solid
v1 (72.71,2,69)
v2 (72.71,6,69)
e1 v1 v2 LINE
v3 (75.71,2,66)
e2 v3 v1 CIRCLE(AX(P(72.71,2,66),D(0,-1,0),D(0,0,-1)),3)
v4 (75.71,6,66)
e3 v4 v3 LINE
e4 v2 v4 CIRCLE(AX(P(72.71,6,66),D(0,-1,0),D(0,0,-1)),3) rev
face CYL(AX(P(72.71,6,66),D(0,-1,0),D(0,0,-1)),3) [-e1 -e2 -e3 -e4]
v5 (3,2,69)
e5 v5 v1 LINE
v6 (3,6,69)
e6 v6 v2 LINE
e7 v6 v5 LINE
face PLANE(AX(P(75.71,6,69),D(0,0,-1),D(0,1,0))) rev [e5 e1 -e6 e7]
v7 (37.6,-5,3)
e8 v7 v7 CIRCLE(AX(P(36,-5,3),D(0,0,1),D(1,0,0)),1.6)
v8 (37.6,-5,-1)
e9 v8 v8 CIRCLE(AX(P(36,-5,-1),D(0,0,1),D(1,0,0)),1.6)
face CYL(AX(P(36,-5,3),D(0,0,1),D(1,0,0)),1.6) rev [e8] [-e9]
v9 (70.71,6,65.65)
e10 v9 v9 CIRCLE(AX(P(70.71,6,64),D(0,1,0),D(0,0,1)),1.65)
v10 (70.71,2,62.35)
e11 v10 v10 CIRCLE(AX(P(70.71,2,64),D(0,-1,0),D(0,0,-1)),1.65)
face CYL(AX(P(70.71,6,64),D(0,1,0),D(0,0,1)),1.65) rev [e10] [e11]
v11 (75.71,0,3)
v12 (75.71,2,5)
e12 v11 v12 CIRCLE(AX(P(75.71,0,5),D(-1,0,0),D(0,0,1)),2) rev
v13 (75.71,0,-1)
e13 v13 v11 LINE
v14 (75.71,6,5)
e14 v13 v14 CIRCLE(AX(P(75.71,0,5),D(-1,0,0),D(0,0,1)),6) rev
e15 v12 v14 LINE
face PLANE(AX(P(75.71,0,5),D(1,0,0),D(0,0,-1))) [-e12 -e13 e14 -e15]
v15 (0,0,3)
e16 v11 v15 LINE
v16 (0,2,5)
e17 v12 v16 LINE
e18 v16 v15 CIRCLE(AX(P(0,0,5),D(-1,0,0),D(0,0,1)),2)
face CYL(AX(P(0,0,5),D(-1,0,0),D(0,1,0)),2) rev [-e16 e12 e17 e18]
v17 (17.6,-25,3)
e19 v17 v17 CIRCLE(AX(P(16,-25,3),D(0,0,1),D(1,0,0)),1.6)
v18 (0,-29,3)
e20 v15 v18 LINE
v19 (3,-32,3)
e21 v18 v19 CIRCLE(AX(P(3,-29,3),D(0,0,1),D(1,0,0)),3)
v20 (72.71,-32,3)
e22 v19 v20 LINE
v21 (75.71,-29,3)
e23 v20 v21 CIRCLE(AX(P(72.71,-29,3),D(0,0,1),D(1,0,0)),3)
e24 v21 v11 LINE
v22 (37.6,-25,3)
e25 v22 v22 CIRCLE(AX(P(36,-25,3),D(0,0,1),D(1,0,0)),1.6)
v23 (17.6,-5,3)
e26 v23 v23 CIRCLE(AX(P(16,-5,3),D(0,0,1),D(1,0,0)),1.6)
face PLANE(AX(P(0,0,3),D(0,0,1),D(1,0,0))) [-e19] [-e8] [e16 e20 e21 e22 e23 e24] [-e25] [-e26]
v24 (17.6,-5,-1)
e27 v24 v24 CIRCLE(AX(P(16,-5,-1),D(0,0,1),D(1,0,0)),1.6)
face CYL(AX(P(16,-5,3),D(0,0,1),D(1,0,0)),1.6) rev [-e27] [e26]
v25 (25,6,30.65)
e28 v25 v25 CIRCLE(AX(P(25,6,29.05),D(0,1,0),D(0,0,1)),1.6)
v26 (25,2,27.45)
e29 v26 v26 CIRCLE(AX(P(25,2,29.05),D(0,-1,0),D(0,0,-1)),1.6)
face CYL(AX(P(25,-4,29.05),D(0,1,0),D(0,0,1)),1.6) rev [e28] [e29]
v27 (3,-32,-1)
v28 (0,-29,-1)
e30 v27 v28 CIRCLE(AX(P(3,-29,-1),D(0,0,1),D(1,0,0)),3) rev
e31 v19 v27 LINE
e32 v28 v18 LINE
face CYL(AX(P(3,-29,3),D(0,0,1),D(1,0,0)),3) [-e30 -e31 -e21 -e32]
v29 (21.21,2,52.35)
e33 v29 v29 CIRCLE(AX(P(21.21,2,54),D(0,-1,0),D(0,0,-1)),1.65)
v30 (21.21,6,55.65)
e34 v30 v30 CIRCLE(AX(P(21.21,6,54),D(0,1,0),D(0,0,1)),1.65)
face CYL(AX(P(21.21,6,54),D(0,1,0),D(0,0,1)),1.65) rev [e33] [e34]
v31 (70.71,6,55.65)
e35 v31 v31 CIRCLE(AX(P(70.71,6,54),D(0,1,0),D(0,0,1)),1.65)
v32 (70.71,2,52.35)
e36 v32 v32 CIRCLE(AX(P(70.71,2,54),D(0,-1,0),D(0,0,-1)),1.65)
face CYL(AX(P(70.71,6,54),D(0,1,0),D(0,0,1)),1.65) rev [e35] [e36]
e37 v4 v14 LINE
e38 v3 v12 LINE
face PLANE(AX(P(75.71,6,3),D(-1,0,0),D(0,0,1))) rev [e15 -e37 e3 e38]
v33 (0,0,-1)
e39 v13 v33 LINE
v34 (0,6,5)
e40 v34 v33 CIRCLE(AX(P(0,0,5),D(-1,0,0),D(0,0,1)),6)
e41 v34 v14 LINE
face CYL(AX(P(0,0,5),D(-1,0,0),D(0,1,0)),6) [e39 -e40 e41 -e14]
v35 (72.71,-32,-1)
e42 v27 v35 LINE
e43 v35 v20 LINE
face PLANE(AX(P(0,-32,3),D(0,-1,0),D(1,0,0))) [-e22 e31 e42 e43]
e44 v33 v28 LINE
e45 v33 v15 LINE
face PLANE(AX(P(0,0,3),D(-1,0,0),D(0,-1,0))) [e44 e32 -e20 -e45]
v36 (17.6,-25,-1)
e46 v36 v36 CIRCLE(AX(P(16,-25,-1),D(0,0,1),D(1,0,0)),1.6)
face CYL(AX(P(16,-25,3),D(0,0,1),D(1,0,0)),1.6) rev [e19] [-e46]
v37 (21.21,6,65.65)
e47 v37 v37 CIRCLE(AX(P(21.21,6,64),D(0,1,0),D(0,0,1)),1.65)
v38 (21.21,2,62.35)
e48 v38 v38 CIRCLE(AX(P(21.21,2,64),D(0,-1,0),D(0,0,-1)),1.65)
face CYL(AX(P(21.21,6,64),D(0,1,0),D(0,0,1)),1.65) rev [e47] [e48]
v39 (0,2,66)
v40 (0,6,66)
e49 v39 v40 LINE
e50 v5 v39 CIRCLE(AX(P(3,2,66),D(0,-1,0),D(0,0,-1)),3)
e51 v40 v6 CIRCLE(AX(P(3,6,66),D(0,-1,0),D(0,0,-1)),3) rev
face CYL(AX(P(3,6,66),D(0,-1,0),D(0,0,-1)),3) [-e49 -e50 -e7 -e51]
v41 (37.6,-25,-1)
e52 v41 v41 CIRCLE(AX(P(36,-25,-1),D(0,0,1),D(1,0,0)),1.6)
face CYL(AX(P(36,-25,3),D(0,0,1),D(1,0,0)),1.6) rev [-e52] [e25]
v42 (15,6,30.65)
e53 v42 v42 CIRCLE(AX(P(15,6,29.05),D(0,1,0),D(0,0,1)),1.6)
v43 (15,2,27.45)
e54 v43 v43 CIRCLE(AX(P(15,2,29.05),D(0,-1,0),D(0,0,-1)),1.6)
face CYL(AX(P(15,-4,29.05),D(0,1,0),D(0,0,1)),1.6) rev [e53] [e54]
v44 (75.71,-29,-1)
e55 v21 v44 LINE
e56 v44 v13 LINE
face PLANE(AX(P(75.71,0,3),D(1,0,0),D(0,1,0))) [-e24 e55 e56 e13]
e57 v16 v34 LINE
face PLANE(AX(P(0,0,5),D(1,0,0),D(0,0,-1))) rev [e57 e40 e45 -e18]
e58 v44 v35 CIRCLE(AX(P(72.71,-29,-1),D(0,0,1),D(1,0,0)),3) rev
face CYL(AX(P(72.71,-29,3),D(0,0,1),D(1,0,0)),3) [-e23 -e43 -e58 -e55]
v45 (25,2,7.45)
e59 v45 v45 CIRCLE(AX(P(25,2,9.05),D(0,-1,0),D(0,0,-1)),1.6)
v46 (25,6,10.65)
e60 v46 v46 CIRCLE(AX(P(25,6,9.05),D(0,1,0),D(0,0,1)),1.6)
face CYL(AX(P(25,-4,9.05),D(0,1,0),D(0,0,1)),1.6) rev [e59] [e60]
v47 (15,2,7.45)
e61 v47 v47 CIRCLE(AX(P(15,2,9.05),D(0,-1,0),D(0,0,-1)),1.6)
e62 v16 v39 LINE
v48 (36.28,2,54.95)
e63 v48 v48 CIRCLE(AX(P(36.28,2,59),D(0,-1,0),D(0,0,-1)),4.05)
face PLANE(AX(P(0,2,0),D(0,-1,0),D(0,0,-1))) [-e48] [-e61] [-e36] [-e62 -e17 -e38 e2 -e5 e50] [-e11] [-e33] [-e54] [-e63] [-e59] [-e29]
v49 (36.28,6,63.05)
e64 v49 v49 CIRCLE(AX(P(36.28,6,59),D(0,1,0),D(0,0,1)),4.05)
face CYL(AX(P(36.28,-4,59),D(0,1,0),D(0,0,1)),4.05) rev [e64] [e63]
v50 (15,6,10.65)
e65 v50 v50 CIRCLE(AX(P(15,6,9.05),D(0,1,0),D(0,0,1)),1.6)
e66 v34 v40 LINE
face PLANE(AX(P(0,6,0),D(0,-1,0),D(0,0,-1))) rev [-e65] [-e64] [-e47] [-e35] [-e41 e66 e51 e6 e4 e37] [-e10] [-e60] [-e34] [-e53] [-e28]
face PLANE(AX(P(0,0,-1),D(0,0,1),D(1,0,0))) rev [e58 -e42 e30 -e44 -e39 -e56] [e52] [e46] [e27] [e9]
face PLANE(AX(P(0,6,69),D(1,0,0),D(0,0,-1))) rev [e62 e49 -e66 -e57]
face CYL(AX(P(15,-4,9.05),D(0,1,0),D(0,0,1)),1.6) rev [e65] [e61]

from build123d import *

# Parameters (mm, degrees)
SKETCH_1_W              = 75.71
SKETCH_1_H              = 32
SKETCH_1_R              = 1.6
EXTRUDE_1_DEPTH         = 3
SHEET_START             = -1
SHEET_METAL_1_OUTLINE_W = 75.71
SHEET_METAL_1_OUTLINE_H = 32
SHEET_METAL_1_OUTLINE_R = 1.6
SHEET_METAL_1_DEPTH     = 1
SM_EDGE_FLANGE_1_DEPTH  = 75.71
SKETCH_26_R             = 4.05
SKETCH_26_R_2           = 1.6
CUT_EXTRUDE_1_DEPTH     = 10
FILLET_4_R              = 3
M4X0_7_1_D              = 3.3


# Read off the part's stored shape, not the designer's step: 轉換-實體1
# Sheet-metal steps are written as plain solids
with BuildPart() as part:
    # Sketch 1 → 填料-伸長1 (new body)
    with BuildSketch(Plane.XY):
        with Locations((37.855, -16)):
            Rectangle(SKETCH_1_W, SKETCH_1_H)
        with Locations((36, -5)):
            Circle(SKETCH_1_R, mode=Mode.SUBTRACT)
        with Locations((16, -5)):
            Circle(SKETCH_1_R, mode=Mode.SUBTRACT)
        with Locations((16, -25)):
            Circle(SKETCH_1_R, mode=Mode.SUBTRACT)
        with Locations((36, -25)):
            Circle(SKETCH_1_R, mode=Mode.SUBTRACT)
    extrude(amount=EXTRUDE_1_DEPTH)

    # Sheet Metal 1 outline → Sheet Metal 1 (add)
    with BuildSketch(Plane.XY.offset(SHEET_START)):
        with Locations((37.855, -16)):
            Rectangle(SHEET_METAL_1_OUTLINE_W, SHEET_METAL_1_OUTLINE_H)
        with Locations((16, -25)):
            Circle(SHEET_METAL_1_OUTLINE_R, mode=Mode.SUBTRACT)
        with Locations((36, -25)):
            Circle(SHEET_METAL_1_OUTLINE_R, mode=Mode.SUBTRACT)
        with Locations((16, -5)):
            Circle(SHEET_METAL_1_OUTLINE_R, mode=Mode.SUBTRACT)
        with Locations((36, -5)):
            Circle(SHEET_METAL_1_OUTLINE_R, mode=Mode.SUBTRACT)
    extrude(amount=SHEET_METAL_1_DEPTH)

    # 邊線-凸緣1 section (across the edge) → 邊線-凸緣1 (add)
    with BuildSketch(Plane(origin=(75.71, 2, 3), x_dir=(0, -1, 0), z_dir=(-1, 0, 0))):
        with BuildLine():
            Line((-4, 2), (-4, 66))
            Line((-4, 66), (0, 66))
            Line((0, 66), (0, 2))
            ThreePointArc((0, 2), (0.585786438, 0.585786438), (2, 0))
            Line((2, 0), (2, -4))
            ThreePointArc((2, -4), (-2.242640687, -2.242640687), (-4, 2))
        make_face()
    extrude(amount=SM_EDGE_FLANGE_1_DEPTH)

    # 草圖26 → 除料-伸長1 (cut)
    with BuildSketch(Plane(origin=(0, 6, 0), x_dir=(1, 0, 0), z_dir=(0, 1, 0))):
        with Locations(Location((36.28, -59, 0), (0, 0, 270))):
            Circle(SKETCH_26_R)
        with Locations(Location((15, -9.05, 0), (0, 0, 270))):
            Circle(SKETCH_26_R_2)
        with Locations(Location((25, -9.05, 0), (0, 0, 270))):
            Circle(SKETCH_26_R_2)
        with Locations(Location((15, -29.05, 0), (0, 0, 270))):
            Circle(SKETCH_26_R_2)
        with Locations(Location((25, -29.05, 0), (0, 0, 270))):
            Circle(SKETCH_26_R_2)
    extrude(amount=-CUT_EXTRUDE_1_DEPTH, mode=Mode.SUBTRACT)

    # 圓角4
    fillet_4_edges = [part.edges().sort_by_distance(p)[0] for p in [
        (0, -32, 1),
        (75.71, -32, 1),
        (75.71, 4, 69),
        (0, 4, 69),
    ]]
    fillet(fillet_4_edges, radius=FILLET_4_R)

    # M4x0.7 螺紋孔1 (through all)
    with Locations(Plane(origin=(70.71, 6, 54), x_dir=(0, 0, 1), z_dir=(0, 1, 0))):
        with Locations((0, 0), (10, 0), (10, -49.5), (0, -49.5)):
            Hole(M4X0_7_1_D / 2)


solid = part.part
